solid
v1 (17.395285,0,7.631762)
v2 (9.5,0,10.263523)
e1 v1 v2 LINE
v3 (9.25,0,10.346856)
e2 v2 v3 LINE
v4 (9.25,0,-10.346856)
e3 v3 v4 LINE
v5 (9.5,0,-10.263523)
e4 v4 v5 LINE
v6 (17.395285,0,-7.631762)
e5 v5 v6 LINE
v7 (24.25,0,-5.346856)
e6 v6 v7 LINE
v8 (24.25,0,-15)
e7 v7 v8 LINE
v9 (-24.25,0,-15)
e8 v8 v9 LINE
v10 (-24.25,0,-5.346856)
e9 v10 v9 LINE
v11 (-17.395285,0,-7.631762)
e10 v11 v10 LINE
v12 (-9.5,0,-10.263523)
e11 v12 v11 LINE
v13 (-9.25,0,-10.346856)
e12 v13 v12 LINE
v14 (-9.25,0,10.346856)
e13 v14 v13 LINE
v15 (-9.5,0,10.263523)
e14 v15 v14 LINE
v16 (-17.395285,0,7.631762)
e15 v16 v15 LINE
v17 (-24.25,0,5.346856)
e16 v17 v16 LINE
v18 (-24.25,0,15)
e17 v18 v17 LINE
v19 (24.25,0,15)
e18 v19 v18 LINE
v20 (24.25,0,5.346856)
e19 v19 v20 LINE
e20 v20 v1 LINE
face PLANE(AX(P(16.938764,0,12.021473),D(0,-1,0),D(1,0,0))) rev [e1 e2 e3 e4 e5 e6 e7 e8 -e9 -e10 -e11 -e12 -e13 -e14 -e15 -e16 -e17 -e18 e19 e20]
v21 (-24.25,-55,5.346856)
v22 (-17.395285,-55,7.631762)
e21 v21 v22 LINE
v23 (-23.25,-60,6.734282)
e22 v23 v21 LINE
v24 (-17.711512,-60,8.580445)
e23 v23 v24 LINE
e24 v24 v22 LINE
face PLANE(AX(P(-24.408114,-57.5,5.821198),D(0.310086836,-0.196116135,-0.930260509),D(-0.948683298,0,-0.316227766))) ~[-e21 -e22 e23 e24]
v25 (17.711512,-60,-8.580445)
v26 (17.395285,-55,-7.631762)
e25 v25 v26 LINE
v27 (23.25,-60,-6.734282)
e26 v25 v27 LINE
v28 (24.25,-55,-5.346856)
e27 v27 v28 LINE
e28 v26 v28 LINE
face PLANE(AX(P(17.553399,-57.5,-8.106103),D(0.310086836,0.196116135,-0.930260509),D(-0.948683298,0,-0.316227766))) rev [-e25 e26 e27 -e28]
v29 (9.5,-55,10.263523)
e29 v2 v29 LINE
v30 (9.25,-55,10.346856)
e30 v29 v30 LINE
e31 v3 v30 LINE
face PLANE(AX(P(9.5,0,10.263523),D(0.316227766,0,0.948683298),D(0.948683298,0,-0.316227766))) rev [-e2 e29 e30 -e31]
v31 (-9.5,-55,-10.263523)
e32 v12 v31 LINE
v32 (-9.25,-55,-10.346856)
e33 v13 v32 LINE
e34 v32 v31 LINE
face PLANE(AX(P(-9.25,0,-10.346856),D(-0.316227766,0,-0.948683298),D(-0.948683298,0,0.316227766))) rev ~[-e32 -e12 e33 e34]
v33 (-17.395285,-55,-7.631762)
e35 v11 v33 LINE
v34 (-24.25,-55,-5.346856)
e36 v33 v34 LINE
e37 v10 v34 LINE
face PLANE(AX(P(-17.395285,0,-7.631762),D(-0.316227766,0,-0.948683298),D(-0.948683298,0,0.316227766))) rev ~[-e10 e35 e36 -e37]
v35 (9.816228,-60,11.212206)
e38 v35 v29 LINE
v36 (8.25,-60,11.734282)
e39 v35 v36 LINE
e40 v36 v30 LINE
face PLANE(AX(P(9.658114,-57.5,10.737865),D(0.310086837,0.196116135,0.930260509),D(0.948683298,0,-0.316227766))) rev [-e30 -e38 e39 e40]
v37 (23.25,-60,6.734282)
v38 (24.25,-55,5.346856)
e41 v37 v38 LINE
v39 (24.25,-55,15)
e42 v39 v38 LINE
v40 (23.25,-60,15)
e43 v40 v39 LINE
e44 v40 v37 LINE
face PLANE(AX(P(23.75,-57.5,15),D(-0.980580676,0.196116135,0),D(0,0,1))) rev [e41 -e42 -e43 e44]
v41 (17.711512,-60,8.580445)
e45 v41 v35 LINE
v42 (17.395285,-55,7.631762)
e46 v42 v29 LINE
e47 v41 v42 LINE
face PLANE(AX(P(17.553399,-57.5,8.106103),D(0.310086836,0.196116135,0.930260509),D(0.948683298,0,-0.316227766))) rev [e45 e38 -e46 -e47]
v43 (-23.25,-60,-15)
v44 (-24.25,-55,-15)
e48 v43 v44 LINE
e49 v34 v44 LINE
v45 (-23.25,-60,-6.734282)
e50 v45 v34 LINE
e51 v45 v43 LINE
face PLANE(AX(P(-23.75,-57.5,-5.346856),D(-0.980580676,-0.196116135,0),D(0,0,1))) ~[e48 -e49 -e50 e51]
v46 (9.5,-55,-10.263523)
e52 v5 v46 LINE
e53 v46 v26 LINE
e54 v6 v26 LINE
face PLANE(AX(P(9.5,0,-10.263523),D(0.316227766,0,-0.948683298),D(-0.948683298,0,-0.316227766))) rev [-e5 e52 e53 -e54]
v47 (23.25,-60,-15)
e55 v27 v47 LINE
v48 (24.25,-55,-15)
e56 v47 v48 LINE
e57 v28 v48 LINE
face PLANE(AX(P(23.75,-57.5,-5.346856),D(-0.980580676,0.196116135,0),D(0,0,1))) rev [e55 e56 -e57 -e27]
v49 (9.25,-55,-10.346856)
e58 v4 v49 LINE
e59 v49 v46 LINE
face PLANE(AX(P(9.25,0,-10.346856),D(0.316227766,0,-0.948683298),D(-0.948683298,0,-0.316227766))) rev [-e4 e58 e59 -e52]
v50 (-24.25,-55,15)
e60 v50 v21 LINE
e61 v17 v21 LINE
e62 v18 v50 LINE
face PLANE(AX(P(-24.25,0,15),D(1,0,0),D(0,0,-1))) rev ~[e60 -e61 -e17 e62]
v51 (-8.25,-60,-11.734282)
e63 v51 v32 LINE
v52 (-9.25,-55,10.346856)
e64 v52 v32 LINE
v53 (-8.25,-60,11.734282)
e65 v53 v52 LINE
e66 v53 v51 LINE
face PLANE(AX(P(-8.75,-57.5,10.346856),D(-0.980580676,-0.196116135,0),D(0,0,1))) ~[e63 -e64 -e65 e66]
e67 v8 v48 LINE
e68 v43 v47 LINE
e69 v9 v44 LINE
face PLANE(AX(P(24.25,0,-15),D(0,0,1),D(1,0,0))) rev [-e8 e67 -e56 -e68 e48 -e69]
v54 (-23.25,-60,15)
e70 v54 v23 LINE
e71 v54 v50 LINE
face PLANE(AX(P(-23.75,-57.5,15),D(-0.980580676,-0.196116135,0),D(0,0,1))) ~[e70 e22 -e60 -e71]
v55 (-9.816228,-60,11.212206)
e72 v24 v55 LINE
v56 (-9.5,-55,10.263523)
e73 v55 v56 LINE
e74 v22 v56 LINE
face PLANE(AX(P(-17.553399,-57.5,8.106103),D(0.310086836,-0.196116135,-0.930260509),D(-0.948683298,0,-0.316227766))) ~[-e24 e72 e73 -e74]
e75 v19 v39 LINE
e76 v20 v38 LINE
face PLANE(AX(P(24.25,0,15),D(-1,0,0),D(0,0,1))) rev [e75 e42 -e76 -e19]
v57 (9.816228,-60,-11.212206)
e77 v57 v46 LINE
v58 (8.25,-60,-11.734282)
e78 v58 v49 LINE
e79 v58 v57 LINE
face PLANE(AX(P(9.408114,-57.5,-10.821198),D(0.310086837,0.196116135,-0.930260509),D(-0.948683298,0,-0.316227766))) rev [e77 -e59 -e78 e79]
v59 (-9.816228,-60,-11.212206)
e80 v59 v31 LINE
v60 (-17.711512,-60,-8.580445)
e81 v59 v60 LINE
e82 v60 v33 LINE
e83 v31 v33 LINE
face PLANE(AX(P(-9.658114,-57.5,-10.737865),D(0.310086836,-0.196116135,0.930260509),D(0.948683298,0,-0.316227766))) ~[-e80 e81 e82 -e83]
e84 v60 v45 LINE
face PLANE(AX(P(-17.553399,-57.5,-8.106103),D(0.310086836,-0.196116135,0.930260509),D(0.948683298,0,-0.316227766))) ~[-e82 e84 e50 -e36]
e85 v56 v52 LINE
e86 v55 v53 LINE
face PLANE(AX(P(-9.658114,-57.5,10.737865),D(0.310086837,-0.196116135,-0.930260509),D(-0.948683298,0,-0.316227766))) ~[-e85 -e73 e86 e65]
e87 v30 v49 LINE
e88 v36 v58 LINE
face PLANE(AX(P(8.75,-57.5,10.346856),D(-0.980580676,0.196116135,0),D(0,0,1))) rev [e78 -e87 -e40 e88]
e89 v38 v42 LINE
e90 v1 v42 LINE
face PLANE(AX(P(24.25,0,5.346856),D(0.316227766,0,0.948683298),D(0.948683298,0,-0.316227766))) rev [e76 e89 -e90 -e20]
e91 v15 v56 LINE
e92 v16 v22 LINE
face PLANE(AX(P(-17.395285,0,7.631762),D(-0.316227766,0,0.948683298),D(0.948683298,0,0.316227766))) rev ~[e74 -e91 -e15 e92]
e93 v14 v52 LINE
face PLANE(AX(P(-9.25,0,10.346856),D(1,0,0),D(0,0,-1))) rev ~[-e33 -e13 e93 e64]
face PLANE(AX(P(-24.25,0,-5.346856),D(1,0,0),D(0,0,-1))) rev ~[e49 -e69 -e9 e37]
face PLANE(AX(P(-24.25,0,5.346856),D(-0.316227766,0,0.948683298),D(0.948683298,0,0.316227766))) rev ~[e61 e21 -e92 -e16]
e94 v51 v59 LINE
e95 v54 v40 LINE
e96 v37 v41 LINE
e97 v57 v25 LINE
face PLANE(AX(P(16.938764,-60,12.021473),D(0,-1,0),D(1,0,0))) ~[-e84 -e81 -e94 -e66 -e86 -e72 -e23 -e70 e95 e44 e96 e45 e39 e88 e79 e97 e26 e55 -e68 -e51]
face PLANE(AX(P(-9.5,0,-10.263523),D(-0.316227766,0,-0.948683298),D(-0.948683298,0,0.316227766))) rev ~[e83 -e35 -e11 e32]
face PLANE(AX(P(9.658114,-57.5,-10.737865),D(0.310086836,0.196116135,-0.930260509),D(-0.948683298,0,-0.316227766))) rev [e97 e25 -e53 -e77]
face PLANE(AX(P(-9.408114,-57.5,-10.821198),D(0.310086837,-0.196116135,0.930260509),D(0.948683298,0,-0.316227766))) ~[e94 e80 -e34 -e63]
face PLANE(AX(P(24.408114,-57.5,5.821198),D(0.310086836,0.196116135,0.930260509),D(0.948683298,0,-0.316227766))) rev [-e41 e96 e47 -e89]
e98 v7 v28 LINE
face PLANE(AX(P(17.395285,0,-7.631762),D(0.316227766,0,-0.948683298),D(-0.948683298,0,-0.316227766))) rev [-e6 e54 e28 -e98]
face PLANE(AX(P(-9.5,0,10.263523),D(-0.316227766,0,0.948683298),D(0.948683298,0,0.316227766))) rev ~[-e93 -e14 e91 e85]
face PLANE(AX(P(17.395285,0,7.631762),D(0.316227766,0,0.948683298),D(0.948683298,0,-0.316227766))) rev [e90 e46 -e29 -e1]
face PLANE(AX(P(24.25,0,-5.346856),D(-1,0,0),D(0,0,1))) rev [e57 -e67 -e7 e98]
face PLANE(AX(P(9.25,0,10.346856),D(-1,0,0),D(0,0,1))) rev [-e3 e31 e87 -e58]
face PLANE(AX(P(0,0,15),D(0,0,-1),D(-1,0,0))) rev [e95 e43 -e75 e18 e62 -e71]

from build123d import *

# Parameters (mm, degrees)
F1_DEPTH = 60
F3_SIZE2 = 5
F3_SIZE  = 1


# Not quite as in the source:
# - a feature names something its author has since deleted; it is built from what else it names


with BuildPart() as f1:
    # F0 (on Front) → F1 (new body)
    with BuildSketch(Plane.XZ):
        Polygon((-9.5, 15), (-24.25, 15), (-24.25, 9.9166666667), (-17.3952847075, 7.6317615692), (-9.5, 10.2635231383), align=None)
        Polygon((-17.3952847075, 7.6317615692), (-24.25, 9.9166666667), (-24.25, 5.3468564717), align=None)
        Polygon((0, 15), (-9.25, 15), (-9.25, 10.3468564717), (-9.25, 4.9166666667), (-9.25, -10.3468564717), (-9.25, -15), (0, -15), align=None)
        Polygon((-9.25, 15), (-9.5, 15), (-9.5, 10.2635231383), (-9.25, 10.3468564717), align=None)
        Polygon((-17.3952847075, -7.6317615692), (-24.25, -9.9166666667), (-24.25, -15), (-9.5, -15), (-9.5, -10.2635231383), align=None)
        Polygon((-24.25, -5.3468564717), (-24.25, -9.9166666667), (-17.3952847075, -7.6317615692), align=None)
        Polygon((-9.25, -10.3468564717), (-9.5, -10.2635231383), (-9.5, -15), (-9.25, -15), align=None)
    extrude(amount=F1_DEPTH)

    # F2: F1 across face


with BuildPart() as f1_1:
    add(f1.part)
    add(f1.part.mirror(Plane(origin=(0, -30, 0), x_dir=(0, 1, 0), z_dir=(1, 0, 0))))

    # F3
    f3_edges = [f1_1.edges().sort_by_distance(p)[0] for p in [
        (-24.25, -60, 10.173428),
        (9.25, -60, 0),
        (16.75, -60, 7.846856),
        (24.25, -60, 10.173428),
        (-16.75, -60, 7.846856),
        (-9.25, -60, 0),
        (-16.75, -60, -7.846856),
        (-24.25, -60, -10.173428),
        (16.75, -60, -7.846856),
        (24.25, -60, -10.173428),
    ]]
    f3_side = f1_1.faces().sort_by_distance((0, -60, 0))[0]
    chamfer(f3_edges, length=F3_SIZE, length2=F3_SIZE2, reference=f3_side)


solid = f1_1.part
